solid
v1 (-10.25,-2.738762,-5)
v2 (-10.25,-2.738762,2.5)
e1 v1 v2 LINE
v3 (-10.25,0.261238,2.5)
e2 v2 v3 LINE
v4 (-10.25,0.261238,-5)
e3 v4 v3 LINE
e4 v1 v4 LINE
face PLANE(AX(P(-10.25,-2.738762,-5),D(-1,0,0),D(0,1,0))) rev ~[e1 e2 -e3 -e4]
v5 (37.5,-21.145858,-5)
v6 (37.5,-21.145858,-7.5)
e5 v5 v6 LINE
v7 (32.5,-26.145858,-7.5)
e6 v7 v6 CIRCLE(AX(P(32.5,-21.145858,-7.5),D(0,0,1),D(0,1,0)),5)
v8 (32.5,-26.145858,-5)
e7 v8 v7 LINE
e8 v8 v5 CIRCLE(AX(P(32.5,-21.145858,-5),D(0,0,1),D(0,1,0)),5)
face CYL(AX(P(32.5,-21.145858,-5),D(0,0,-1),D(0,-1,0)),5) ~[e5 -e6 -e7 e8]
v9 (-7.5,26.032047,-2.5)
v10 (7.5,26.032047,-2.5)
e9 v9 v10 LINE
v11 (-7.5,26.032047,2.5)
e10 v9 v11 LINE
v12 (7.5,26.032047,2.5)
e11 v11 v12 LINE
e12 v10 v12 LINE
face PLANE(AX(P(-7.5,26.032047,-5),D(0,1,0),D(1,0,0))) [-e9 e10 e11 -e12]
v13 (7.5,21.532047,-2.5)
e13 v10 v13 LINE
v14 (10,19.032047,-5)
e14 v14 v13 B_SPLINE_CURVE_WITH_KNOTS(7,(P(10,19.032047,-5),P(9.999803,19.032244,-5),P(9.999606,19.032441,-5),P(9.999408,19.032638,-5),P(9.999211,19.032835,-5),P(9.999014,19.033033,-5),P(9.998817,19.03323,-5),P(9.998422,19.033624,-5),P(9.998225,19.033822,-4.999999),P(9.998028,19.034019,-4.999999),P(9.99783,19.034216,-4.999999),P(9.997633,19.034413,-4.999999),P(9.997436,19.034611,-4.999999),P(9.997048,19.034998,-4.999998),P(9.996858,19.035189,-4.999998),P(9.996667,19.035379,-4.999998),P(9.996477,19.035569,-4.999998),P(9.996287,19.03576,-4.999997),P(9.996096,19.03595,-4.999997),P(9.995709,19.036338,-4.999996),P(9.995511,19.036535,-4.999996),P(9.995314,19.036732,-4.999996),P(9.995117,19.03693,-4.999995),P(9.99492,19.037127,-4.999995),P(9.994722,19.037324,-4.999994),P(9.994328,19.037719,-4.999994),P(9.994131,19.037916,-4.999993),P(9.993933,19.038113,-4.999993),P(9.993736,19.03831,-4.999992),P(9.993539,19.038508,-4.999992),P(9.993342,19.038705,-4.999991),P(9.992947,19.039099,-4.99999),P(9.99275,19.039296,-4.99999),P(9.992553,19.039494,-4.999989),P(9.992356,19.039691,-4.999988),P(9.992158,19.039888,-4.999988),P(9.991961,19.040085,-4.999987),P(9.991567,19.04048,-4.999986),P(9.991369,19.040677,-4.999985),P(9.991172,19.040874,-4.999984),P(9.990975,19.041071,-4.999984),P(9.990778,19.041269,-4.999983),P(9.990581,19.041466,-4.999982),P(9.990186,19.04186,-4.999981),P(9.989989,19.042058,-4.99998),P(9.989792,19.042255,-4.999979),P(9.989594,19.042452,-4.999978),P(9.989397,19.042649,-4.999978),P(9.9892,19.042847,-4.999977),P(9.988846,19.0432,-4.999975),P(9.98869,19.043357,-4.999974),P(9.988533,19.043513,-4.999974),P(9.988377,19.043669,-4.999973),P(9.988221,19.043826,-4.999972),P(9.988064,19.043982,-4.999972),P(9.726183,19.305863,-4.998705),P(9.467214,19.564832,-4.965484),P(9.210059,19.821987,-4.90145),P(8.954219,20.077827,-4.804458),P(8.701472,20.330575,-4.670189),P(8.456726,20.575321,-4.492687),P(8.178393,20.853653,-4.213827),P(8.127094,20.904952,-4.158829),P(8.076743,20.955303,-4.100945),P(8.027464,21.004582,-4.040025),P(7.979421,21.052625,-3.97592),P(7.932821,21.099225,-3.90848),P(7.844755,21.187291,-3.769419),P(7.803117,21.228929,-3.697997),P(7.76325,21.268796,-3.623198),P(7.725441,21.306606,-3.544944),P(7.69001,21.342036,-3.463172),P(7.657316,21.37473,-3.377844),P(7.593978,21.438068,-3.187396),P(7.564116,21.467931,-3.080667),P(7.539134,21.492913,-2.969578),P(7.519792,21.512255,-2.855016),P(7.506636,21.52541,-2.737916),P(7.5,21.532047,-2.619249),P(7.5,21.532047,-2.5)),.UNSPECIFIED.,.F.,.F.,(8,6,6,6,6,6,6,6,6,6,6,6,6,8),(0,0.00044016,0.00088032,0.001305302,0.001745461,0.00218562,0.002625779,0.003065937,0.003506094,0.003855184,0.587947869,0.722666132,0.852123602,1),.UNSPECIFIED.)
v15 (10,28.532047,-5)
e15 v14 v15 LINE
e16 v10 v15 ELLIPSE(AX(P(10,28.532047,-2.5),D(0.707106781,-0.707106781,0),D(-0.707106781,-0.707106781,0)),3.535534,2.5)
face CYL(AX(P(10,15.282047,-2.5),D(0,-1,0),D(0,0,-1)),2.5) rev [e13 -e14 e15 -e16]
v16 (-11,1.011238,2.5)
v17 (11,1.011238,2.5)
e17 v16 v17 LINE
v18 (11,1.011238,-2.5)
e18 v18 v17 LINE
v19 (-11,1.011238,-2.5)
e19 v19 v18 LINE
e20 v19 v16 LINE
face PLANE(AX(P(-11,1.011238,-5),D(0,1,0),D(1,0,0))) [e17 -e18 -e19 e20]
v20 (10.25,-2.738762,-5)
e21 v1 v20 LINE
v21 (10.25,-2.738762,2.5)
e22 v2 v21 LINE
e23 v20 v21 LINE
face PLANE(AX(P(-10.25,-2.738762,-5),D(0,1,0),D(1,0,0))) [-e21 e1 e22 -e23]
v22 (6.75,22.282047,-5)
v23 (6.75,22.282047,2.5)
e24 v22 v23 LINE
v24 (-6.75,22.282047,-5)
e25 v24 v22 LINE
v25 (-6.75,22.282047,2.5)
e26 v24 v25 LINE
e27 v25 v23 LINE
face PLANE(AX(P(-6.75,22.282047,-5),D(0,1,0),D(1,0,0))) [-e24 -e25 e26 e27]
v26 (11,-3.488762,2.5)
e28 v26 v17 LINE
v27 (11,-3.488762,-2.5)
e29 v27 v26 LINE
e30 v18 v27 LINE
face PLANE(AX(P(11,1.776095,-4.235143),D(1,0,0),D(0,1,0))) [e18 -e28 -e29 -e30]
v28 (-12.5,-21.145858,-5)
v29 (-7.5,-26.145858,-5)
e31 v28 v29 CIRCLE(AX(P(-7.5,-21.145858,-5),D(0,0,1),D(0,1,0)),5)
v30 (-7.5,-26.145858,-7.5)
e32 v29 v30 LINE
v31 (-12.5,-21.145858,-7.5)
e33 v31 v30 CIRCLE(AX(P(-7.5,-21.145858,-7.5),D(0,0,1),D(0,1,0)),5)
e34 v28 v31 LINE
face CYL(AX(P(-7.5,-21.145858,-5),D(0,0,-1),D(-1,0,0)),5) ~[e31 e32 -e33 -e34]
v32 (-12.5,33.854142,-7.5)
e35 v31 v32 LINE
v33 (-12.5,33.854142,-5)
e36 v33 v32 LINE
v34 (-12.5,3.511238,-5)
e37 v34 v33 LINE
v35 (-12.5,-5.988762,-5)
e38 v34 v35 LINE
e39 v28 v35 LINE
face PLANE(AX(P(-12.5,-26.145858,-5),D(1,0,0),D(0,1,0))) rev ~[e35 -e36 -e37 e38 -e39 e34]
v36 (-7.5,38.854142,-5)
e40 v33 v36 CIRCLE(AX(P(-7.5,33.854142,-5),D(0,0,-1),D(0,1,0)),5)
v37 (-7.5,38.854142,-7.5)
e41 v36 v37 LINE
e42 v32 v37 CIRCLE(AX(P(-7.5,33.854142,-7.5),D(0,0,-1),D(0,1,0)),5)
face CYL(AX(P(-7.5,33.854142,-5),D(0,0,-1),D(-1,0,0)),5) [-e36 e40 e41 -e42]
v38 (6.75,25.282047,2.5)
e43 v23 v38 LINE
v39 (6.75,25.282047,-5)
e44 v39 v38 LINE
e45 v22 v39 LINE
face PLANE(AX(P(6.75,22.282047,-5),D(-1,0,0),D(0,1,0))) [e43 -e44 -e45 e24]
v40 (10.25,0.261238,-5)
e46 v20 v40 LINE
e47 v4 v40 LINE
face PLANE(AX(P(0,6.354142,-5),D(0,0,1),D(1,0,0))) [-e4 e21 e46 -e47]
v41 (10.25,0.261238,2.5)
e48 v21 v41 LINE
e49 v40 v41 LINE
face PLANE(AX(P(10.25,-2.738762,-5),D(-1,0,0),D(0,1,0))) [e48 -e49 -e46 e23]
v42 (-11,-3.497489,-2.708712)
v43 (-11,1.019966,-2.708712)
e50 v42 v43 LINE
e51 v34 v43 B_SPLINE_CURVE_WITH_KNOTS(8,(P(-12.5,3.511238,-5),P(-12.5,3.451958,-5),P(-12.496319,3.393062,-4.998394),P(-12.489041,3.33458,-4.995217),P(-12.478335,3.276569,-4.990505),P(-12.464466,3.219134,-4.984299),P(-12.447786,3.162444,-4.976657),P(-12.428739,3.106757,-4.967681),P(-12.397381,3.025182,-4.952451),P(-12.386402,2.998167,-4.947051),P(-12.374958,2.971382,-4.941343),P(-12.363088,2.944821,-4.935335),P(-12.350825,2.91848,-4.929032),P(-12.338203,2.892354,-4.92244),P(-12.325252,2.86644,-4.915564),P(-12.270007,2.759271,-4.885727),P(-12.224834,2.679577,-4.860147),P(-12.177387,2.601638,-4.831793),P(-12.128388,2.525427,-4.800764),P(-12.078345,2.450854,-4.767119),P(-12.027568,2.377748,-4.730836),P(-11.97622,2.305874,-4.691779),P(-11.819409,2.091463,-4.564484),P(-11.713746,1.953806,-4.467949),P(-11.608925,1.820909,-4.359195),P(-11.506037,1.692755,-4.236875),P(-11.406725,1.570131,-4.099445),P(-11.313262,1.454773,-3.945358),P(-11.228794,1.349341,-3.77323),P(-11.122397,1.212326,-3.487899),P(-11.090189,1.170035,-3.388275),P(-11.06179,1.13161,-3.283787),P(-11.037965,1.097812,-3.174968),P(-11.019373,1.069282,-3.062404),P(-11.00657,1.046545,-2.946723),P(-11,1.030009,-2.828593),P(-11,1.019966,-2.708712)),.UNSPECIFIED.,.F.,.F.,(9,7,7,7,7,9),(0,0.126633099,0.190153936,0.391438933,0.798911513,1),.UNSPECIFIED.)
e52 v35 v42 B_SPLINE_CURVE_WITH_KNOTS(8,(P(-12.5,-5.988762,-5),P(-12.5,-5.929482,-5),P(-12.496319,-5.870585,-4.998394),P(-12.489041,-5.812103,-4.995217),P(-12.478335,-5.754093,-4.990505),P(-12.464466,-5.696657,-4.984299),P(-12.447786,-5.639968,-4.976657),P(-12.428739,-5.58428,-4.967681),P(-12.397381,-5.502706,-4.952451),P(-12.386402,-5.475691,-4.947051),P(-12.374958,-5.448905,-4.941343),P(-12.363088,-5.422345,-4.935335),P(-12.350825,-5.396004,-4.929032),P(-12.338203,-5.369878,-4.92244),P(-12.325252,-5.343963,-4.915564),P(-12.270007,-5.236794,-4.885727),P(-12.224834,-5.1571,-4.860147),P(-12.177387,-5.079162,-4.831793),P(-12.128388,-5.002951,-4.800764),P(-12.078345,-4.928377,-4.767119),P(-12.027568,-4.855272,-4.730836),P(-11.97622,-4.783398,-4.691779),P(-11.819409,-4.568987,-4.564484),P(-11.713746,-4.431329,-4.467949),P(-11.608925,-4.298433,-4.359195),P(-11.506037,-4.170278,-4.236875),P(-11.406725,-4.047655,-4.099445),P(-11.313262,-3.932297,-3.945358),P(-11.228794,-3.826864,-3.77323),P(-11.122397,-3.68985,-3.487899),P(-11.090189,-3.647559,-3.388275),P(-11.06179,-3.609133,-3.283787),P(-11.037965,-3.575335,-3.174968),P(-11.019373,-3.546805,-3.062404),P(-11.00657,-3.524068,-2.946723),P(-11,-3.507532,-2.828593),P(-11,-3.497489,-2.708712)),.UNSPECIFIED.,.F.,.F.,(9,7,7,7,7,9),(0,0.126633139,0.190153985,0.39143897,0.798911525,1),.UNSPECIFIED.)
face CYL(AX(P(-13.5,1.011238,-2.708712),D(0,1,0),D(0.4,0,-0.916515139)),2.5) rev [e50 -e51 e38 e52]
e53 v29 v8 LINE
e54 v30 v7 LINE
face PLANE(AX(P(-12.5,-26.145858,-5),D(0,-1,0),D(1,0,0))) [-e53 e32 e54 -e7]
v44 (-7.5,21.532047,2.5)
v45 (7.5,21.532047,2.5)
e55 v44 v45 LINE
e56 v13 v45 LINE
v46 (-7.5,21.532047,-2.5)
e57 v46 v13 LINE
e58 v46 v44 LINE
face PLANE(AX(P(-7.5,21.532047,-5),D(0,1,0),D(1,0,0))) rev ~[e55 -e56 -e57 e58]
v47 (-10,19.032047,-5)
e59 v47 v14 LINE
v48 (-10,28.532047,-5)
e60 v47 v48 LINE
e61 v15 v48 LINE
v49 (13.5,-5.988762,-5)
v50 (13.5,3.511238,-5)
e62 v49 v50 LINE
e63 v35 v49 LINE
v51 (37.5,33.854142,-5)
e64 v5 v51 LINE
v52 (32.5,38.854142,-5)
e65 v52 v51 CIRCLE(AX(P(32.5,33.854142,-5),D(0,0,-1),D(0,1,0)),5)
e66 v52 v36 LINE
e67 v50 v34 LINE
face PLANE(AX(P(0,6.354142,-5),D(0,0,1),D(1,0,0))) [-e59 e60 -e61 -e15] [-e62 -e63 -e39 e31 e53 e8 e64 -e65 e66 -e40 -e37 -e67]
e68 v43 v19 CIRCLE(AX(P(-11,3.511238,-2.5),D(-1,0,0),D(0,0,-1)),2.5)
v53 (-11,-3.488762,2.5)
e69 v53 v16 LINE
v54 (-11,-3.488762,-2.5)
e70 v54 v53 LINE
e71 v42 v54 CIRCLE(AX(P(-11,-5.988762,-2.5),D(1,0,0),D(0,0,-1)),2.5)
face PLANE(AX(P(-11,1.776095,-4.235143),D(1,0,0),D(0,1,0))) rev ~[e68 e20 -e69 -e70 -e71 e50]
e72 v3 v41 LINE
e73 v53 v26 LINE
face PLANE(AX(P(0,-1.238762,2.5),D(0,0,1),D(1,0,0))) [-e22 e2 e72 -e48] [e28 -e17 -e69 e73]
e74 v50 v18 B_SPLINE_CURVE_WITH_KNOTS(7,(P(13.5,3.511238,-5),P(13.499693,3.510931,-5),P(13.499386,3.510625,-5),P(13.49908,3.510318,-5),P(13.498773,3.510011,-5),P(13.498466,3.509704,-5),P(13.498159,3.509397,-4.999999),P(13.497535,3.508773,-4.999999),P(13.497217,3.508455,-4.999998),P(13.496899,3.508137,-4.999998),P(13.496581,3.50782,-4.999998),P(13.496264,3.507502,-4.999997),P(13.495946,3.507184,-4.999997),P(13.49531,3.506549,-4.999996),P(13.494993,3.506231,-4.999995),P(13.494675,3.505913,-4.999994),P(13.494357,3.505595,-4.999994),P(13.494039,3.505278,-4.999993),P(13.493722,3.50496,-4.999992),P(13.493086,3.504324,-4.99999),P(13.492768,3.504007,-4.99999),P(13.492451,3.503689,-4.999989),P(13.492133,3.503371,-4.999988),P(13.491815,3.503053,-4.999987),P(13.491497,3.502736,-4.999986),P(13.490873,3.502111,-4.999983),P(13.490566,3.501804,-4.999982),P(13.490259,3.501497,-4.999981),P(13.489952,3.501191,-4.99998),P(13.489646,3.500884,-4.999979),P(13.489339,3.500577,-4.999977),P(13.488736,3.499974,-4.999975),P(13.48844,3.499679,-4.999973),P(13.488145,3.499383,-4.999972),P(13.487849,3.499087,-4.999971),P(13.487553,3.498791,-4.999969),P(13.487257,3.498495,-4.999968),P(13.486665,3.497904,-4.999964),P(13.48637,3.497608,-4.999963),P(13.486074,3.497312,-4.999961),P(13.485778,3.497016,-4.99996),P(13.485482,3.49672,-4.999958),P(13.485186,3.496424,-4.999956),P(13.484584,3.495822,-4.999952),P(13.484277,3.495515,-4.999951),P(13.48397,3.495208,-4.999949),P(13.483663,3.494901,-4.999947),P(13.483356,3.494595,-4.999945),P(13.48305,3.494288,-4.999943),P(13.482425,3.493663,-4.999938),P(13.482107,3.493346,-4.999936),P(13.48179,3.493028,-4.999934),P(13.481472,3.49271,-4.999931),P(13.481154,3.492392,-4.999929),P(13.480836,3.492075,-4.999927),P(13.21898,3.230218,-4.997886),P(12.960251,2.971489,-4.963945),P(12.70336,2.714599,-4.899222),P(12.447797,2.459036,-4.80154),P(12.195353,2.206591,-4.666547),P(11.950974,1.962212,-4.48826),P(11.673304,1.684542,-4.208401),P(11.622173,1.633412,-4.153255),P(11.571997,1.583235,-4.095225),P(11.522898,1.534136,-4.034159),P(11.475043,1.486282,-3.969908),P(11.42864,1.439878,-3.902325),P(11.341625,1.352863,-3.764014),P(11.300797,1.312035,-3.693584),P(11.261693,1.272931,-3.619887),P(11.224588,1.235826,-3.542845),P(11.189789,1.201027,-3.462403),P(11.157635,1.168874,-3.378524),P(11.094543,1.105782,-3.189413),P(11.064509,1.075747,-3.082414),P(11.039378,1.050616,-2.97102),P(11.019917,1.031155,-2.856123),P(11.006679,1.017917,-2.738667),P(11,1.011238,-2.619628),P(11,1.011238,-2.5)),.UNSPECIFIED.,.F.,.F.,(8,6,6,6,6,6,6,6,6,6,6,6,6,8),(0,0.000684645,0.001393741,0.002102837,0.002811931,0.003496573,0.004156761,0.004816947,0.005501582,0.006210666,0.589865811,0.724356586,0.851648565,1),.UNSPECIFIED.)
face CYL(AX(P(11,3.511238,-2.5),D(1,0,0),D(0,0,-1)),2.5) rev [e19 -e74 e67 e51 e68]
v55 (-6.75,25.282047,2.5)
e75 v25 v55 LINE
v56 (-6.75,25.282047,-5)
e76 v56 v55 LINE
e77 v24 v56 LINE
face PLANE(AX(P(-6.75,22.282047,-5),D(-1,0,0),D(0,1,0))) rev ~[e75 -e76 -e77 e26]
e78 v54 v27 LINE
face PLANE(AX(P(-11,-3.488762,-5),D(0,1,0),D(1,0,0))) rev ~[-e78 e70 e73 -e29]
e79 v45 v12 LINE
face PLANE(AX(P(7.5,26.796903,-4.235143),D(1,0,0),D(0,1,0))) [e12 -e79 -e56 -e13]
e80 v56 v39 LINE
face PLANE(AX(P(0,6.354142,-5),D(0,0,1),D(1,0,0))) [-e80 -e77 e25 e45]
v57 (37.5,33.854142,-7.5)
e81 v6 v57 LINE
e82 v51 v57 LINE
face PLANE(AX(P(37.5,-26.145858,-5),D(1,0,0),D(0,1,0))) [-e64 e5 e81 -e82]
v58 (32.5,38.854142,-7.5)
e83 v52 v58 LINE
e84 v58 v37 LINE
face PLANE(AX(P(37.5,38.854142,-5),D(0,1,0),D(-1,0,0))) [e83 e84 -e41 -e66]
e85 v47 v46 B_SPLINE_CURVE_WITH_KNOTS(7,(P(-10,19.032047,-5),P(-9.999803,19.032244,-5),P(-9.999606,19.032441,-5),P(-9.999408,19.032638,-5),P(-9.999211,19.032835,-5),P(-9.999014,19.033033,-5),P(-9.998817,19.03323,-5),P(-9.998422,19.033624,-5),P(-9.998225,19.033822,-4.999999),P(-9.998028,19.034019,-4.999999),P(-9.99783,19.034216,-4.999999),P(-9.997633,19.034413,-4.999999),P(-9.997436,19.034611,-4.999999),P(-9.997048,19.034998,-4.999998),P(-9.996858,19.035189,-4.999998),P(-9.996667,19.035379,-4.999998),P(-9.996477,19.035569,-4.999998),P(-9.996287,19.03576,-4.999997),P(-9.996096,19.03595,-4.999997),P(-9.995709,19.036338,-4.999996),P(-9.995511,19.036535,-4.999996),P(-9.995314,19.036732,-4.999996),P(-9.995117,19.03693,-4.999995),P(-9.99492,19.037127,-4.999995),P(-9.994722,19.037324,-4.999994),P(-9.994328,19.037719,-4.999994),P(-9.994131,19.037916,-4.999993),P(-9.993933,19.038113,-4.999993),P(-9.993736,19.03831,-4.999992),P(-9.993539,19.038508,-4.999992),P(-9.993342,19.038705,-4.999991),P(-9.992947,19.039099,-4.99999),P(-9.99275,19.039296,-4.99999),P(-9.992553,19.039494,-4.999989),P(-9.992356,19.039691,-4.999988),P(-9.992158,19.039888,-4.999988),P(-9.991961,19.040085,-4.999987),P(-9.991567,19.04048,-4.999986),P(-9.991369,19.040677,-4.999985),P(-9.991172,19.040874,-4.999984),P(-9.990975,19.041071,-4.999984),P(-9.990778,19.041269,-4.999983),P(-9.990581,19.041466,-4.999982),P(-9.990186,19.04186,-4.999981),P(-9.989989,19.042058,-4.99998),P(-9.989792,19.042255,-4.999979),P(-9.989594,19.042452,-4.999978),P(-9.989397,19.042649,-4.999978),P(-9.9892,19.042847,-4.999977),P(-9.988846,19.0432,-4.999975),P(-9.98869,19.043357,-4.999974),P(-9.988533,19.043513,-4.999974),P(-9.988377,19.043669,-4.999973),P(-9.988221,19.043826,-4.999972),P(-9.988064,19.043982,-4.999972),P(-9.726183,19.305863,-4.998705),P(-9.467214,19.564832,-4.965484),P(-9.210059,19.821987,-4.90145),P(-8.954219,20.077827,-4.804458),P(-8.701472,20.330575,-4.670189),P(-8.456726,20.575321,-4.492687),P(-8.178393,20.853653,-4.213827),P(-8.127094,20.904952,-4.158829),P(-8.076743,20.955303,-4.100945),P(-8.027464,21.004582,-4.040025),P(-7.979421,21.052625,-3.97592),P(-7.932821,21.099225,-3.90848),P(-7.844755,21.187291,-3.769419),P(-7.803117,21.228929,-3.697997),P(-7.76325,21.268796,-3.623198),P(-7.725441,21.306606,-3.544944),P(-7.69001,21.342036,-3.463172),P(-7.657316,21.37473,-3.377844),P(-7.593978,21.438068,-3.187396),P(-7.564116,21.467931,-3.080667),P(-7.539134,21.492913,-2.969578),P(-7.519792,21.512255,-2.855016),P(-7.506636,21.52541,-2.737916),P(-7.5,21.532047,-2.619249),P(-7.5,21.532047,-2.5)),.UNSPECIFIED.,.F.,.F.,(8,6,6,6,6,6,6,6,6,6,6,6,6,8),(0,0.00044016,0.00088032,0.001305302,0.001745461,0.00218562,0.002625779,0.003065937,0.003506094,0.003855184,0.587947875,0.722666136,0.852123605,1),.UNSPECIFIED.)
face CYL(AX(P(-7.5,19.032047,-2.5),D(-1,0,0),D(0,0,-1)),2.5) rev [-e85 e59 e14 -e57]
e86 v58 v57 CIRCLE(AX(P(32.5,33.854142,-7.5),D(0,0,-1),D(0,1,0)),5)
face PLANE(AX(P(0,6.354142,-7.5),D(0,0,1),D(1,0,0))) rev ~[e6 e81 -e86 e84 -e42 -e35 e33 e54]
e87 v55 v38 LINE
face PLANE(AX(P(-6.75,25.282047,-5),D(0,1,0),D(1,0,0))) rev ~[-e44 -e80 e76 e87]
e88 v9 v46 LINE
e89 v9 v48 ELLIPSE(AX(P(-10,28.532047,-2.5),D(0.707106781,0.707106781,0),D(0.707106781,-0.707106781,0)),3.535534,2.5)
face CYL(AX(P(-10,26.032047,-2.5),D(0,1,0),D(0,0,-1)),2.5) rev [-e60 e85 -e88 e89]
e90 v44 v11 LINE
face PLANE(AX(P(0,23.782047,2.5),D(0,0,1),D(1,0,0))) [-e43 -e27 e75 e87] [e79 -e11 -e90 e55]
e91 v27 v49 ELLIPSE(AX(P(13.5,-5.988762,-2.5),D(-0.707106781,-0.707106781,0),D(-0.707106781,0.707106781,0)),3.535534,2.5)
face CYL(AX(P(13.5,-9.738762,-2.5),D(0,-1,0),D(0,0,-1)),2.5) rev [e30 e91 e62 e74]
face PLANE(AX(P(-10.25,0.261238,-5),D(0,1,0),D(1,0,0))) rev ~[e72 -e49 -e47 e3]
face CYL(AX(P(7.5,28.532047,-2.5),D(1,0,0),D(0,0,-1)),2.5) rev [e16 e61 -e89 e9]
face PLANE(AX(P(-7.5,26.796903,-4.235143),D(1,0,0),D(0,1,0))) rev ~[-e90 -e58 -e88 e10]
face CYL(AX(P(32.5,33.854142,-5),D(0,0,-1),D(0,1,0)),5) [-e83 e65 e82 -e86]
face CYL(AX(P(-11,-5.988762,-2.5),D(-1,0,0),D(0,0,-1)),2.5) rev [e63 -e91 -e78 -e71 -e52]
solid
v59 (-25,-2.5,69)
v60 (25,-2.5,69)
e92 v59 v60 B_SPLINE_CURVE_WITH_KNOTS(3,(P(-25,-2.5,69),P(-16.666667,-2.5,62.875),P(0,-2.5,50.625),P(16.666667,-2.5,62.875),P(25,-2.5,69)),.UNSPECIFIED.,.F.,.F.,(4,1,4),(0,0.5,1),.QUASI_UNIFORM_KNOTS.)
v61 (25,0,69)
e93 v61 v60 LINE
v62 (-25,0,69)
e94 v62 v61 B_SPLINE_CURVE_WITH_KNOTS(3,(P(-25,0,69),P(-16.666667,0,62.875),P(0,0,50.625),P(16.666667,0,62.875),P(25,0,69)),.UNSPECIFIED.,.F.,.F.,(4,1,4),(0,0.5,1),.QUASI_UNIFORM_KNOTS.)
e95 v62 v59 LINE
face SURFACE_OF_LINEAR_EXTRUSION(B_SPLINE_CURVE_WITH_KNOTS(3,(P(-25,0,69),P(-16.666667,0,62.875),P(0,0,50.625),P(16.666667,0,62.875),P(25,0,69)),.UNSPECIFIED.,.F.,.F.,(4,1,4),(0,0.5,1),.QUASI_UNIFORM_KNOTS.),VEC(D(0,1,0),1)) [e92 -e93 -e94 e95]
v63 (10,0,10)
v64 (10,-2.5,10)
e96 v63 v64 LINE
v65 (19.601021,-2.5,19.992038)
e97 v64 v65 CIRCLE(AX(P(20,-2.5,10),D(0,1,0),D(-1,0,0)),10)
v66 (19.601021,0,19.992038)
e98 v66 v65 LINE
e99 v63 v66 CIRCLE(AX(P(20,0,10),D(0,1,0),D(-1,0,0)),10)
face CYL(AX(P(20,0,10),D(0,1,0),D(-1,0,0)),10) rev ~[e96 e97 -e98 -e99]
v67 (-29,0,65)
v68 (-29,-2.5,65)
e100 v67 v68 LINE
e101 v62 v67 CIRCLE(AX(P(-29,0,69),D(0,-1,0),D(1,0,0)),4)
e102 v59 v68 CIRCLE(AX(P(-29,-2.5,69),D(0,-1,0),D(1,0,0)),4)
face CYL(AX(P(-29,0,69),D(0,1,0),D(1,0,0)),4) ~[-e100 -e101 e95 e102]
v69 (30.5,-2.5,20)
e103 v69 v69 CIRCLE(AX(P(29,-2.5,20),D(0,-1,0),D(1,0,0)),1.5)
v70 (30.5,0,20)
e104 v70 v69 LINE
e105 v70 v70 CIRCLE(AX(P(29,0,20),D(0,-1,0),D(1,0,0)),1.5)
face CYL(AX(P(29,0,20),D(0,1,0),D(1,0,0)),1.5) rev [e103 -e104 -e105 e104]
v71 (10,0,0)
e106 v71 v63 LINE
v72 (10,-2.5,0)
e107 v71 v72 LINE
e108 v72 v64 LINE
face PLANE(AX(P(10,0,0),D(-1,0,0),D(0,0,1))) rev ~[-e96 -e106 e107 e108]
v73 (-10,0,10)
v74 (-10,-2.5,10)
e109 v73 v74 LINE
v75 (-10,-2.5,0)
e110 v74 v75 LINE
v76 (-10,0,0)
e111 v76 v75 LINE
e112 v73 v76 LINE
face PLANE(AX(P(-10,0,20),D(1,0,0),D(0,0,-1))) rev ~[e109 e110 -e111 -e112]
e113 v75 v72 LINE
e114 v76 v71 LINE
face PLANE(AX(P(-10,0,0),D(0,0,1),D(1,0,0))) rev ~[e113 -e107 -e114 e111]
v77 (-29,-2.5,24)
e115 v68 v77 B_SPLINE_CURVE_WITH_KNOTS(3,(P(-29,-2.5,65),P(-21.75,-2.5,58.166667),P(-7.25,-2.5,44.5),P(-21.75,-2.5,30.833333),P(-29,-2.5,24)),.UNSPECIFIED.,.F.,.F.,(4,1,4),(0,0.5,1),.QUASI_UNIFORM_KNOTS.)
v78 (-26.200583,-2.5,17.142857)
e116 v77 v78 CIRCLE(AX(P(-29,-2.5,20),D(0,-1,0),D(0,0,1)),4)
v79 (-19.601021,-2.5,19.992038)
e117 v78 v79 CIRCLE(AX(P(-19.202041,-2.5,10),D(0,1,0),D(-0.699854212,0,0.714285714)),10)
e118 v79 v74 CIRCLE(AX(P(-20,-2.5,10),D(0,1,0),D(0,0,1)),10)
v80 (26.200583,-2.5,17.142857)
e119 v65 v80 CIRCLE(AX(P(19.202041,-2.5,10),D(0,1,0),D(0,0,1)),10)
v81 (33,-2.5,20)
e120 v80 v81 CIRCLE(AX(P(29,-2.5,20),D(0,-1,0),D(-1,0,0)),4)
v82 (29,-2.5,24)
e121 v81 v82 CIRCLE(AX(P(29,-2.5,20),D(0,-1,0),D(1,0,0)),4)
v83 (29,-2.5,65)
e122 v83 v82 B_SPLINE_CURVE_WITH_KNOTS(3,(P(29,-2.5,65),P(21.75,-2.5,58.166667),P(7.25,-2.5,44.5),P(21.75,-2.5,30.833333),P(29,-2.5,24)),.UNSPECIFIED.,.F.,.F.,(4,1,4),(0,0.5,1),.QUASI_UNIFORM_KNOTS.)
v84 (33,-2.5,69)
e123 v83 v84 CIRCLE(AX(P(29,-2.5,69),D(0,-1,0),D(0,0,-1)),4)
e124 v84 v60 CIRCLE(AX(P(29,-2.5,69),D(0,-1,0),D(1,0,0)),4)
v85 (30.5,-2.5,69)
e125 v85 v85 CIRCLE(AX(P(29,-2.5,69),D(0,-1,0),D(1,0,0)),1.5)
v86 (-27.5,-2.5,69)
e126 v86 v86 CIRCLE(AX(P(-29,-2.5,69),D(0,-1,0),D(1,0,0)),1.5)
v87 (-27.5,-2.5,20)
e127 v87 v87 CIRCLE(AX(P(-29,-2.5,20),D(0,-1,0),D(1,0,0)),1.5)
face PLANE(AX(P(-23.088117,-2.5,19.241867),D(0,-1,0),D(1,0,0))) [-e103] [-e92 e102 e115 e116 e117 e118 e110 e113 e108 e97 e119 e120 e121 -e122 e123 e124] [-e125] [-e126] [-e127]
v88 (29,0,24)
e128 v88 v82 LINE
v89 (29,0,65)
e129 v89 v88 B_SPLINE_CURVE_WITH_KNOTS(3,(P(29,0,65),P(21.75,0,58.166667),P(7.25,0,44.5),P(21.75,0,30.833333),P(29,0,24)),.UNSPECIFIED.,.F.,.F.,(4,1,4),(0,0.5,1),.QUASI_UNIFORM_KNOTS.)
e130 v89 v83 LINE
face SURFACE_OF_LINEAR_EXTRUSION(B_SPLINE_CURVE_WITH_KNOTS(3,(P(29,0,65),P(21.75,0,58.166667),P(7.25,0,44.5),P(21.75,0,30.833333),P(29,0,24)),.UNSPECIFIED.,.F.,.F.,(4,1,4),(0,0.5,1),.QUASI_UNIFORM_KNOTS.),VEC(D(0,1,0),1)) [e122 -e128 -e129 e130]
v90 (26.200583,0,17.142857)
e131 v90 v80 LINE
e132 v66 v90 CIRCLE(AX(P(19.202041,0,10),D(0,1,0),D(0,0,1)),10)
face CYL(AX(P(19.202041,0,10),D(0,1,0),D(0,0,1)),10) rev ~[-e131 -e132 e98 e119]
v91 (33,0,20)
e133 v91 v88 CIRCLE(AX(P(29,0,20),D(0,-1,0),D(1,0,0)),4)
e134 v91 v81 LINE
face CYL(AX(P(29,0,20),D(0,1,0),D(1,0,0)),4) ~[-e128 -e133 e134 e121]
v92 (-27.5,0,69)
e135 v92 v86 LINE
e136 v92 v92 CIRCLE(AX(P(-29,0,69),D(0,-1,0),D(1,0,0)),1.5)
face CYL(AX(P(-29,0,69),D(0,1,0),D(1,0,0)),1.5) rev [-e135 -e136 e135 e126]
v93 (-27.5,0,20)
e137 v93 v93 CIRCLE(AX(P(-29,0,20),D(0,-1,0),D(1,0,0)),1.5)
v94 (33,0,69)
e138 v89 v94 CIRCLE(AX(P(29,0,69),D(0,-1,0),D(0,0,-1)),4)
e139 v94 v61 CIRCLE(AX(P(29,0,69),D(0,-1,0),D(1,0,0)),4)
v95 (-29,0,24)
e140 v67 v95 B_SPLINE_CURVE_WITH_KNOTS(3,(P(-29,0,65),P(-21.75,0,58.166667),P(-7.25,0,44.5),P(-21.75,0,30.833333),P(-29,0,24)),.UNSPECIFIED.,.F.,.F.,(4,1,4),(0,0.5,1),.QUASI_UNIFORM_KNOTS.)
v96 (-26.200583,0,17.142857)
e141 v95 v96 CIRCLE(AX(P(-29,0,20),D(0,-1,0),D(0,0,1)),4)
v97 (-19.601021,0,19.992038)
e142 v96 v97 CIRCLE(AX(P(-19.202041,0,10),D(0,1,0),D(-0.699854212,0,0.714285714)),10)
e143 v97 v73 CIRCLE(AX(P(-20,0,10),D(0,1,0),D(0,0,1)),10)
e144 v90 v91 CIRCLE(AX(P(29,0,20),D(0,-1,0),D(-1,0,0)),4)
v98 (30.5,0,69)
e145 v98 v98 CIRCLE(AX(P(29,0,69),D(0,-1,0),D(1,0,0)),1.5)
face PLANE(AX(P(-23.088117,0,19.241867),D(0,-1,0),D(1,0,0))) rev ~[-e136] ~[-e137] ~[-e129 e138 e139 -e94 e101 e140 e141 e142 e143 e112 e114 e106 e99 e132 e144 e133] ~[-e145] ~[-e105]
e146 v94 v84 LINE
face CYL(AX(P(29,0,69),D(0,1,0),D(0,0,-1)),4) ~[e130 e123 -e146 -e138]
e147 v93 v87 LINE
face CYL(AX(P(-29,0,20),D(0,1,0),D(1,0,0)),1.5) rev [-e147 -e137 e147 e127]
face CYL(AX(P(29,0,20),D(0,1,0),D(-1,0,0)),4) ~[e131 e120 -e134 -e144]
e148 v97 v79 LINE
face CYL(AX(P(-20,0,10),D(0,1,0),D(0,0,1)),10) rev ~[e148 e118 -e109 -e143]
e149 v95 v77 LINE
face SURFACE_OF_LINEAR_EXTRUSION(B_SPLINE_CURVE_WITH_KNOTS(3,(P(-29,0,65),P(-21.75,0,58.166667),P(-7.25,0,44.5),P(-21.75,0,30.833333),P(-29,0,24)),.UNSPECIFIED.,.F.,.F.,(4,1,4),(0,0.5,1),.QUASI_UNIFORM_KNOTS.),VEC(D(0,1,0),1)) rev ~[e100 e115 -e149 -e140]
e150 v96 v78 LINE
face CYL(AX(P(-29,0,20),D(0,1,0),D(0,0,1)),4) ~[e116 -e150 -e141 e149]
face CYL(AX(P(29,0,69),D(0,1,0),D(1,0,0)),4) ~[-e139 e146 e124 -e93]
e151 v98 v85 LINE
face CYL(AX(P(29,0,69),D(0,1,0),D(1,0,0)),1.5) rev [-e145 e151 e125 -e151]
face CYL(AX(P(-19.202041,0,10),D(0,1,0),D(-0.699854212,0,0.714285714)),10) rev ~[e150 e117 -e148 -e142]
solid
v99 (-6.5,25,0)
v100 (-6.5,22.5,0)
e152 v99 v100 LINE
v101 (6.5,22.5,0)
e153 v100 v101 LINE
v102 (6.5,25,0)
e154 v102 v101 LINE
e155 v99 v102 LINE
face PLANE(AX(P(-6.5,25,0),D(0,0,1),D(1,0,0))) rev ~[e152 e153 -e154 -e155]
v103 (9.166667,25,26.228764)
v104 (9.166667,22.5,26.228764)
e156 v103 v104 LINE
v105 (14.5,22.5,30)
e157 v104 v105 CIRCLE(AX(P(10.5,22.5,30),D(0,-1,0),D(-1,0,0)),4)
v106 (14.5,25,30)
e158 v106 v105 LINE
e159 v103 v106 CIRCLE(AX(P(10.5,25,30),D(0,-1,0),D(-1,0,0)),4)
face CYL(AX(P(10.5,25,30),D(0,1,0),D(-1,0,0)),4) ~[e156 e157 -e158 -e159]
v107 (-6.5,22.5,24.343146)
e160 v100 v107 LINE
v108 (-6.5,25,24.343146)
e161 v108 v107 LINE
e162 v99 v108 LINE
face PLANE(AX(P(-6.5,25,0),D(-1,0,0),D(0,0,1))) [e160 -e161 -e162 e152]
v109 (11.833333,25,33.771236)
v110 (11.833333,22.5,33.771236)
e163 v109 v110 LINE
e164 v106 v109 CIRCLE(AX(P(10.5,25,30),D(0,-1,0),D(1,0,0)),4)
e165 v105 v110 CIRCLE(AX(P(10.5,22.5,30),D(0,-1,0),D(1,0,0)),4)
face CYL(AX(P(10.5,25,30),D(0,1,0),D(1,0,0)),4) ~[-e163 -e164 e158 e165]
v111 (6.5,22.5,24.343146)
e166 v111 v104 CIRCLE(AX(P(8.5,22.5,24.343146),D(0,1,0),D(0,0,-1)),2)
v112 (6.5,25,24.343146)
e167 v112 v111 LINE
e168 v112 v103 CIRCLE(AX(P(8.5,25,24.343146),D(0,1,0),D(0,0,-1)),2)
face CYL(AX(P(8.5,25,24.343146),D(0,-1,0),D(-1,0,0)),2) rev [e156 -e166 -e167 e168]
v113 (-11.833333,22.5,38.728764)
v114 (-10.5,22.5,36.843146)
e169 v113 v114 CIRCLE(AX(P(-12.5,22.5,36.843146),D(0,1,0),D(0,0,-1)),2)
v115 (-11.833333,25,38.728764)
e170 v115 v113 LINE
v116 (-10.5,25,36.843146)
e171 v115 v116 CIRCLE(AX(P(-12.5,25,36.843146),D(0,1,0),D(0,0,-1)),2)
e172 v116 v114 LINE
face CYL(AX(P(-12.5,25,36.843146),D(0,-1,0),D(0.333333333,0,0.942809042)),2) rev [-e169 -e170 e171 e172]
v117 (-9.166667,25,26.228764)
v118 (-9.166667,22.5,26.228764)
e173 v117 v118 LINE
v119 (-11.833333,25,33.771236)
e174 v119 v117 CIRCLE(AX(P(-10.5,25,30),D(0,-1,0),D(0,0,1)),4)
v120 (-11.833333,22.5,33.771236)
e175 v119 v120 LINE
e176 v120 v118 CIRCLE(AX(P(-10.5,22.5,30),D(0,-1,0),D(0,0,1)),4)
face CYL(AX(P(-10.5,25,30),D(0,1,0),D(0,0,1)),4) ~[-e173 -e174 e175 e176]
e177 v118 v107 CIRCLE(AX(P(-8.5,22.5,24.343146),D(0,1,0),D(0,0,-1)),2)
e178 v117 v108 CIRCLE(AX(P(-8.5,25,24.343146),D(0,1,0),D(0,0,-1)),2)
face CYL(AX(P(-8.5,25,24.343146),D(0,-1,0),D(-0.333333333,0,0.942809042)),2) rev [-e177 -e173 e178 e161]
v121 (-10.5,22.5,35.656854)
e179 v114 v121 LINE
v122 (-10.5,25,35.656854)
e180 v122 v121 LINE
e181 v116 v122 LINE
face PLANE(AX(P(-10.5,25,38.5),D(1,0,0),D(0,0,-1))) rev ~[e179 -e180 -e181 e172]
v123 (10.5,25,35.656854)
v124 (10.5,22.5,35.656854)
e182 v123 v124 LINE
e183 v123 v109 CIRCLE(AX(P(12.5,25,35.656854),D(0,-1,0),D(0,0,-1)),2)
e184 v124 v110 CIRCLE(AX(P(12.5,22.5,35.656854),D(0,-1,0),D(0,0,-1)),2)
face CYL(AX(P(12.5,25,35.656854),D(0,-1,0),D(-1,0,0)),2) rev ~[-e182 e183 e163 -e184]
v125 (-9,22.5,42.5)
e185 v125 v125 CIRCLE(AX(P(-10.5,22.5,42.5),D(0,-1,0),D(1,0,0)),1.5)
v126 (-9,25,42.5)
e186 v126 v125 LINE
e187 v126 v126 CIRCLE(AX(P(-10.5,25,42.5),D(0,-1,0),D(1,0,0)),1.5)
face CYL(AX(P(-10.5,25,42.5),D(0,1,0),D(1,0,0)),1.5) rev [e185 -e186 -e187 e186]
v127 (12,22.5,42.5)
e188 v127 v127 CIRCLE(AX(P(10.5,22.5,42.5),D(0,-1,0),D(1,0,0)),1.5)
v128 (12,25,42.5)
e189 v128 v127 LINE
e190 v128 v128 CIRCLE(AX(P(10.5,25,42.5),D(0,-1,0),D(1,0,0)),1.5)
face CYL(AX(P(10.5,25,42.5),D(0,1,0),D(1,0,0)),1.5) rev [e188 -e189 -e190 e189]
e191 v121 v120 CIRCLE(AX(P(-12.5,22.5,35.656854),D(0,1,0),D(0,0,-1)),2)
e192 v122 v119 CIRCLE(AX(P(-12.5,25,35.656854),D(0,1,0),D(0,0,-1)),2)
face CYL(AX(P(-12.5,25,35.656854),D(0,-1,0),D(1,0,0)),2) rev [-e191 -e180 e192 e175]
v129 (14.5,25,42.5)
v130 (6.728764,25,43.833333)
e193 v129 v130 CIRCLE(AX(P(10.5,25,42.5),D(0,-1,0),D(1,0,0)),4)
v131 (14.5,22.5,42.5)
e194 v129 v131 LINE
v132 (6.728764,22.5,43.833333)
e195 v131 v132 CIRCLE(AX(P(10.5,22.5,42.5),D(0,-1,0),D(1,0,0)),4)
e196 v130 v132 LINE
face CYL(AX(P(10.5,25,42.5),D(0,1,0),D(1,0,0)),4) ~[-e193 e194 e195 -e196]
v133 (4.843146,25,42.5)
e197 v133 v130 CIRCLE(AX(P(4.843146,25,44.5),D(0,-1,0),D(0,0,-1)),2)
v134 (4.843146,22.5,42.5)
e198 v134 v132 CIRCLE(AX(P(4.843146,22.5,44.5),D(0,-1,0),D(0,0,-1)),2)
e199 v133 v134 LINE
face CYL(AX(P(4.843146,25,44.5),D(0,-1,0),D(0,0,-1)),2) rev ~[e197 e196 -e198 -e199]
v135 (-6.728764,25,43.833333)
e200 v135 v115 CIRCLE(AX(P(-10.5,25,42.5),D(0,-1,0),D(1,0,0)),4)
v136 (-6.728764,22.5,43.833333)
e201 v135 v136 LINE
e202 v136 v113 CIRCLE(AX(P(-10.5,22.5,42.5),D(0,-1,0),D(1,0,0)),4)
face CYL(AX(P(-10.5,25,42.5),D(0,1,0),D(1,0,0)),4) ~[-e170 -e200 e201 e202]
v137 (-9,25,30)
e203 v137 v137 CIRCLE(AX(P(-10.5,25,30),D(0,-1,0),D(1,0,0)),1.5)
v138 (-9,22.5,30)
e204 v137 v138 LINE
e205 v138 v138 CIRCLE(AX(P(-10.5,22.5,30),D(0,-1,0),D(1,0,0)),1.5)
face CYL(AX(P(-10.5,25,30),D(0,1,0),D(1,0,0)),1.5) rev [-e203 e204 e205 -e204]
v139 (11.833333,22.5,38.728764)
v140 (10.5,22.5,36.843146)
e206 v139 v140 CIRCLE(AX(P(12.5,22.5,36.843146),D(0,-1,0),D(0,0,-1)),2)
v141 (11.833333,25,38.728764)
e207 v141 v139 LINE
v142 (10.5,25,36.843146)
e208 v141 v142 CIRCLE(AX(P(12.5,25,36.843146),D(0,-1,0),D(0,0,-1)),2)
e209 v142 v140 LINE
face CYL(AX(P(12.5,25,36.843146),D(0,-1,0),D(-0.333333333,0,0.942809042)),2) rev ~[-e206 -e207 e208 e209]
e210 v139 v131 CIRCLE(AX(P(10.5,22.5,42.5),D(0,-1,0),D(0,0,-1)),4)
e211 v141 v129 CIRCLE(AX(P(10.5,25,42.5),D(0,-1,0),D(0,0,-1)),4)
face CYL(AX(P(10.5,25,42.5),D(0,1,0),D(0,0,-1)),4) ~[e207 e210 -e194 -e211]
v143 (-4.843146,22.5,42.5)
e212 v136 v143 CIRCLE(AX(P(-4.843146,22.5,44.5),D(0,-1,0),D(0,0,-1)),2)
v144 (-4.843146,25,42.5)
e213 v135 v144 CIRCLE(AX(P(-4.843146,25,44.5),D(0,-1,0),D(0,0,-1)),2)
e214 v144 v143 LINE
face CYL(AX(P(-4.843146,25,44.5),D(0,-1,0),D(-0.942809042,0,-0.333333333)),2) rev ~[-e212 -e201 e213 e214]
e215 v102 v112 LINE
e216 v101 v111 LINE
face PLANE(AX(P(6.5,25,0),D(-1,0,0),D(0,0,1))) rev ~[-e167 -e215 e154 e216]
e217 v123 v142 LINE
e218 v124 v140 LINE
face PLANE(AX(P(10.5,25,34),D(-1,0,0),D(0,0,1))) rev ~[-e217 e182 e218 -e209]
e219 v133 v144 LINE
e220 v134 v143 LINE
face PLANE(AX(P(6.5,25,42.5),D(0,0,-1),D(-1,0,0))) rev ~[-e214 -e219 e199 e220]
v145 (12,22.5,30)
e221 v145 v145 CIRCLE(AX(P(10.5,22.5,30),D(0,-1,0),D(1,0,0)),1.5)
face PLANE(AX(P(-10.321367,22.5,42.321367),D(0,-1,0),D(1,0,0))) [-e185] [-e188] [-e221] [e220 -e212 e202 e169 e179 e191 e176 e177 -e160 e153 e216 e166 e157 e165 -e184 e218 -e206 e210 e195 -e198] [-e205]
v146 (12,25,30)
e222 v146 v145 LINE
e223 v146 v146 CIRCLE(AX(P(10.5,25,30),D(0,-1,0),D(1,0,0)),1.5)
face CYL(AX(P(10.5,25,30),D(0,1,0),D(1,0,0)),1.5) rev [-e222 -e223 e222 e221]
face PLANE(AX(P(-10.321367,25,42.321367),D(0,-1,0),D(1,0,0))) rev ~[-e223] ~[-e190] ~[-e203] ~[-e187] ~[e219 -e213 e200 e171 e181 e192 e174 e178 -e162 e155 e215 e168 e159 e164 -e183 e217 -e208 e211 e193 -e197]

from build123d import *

# Parameters (mm, degrees)
F0_R          = 1.5
F1_DEPTH      = 2.5
F2_T1_DEPTH   = 2.5
F4_R          = 1.5
F4_W          = 13
F4_H          = 30
F5_DEPTH      = 2.5
F6_R          = 2
F7_R          = 2
F9_W          = 25
F9_H          = 65
F9_W_2        = 22
F9_H_2        = 4.5
F9_W_3        = 15
F9_W_4        = 20.5
F9_H_3        = 3
F9_W_5        = 13.5
F10_DEPTH     = 2.5
F11_DEPTH     = 7.5
F12_R         = 5
F13_T1_DEPTH  = 15
F13_T3_DEPTH  = 22
F13_T5_DEPTH  = 4.5
F13_T7_DEPTH  = 4.5
F13_T13_DEPTH = 10.75
F13_T17_DEPTH = 21.25
F13_T24_DEPTH = 21.25
F13_T29_DEPTH = 10.75
F13_T36_DEPTH = 10.75
F13_T40_DEPTH = 28.25
F13_T47_DEPTH = 28.25
F13_T52_DEPTH = 10.2282196187
F13_T59_DEPTH = 21.25
F13_T64_DEPTH = 10.75
F13_T71_DEPTH = 28.25
F13_T76_DEPTH = 10.2282196187
F13_T83_DEPTH = 21.25
F13_T87_DEPTH = 10.75
F13_T94_DEPTH = 28.25
F13_T98_DEPTH = 10.75


# Not quite as in the source:
# - a fillet or chamfer that OpenCascade refuses, or shapes differently, is made with other operations: its cross-section is extruded or revolved along the edge and cut away or added


with BuildPart() as f1:
    # F0 (on Front) → F1 (new body)
    with BuildSketch(Plane.XZ):
        with BuildLine():
            ThreePointArc((-29, 65), (-26.1715728753, 66.1715728753), (-25, 69))
            ThreePointArc((-25, 69), (-31.8284271247, 71.8284271247), (-29, 65))
        make_face()
        with Locations((-29, 69)):
            Circle(F0_R, mode=Mode.SUBTRACT)
        with BuildLine():
            add(Edge.make_bspline(
                [(-25, 69), (-16.6666666667, 62.875), (0, 50.625), (16.6666666667, 62.875), (25, 69)],
                knots=[0, 0, 0, 0, 0.5, 1, 1, 1, 1], degree=3))
            ThreePointArc((-25, 69), (-26.1715728753, 66.1715728753), (-29, 65))
            add(Edge.make_bspline(
                [(-29, 65), (-21.75, 58.1666666667), (-7.25, 44.5), (-21.75, 30.8333333333), (-29, 24)],
                knots=[0, 0, 0, 0, 0.5, 1, 1, 1, 1], degree=3))
            ThreePointArc((-29, 24), (-26.1715728753, 22.8284271247), (-25, 20))
            Line((-25, 20), (-10, 20))
            Line((-10, 20), (-10, 0))
            Line((-10, 0), (10, 0))
            Line((10, 0), (10, 20))
            Line((10, 20), (25, 20))
            ThreePointArc((25, 20), (26.1715728753, 22.8284271247), (29, 24))
            add(Edge.make_bspline(
                [(29, 65), (21.75, 58.1666666667), (7.25, 44.5), (21.75, 30.8333333333), (29, 24)],
                knots=[0, 0, 0, 0, 0.5, 1, 1, 1, 1], degree=3))
            ThreePointArc((29, 65), (26.1715728753, 66.1715728753), (25, 69))
        make_face()
        with BuildLine():
            ThreePointArc((33, 69), (29, 73), (25, 69))
            ThreePointArc((25, 69), (26.1715728753, 66.1715728753), (29, 65))
            ThreePointArc((29, 65), (31.8284271247, 66.1715728753), (33, 69))
        make_face()
        with Locations((29, 69)):
            Circle(F0_R, mode=Mode.SUBTRACT)
        with BuildLine():
            ThreePointArc((-25, 20), (-26.1715728753, 22.8284271247), (-29, 24))
            ThreePointArc((-29, 24), (-31.8284271247, 17.1715728753), (-25, 20))
        make_face()
        with Locations((-29, 20)):
            Circle(F0_R, mode=Mode.SUBTRACT)
        with BuildLine():
            ThreePointArc((33, 20), (31.8284271247, 22.8284271247), (29, 24))
            ThreePointArc((29, 24), (26.1715728753, 22.8284271247), (25, 20))
            ThreePointArc((25, 20), (29, 16), (33, 20))
        make_face()
        with Locations((29, 20)):
            Circle(F0_R, mode=Mode.SUBTRACT)
    extrude(amount=F1_DEPTH)

    # F2: fillet of radius 10 on 4 edges, made by hand

    # F2_s2 → F2_t1 (join)
    with BuildSketch(Plane.XZ):
        with BuildLine():
            ThreePointArc((-26.2005831511, 17.1428571429), (-22.981685759, 19.2582009977), (-19.2020410289, 20))
            Line((-19.2020410289, 20), (-25, 20))
            ThreePointArc((-25, 20), (-25.3123403495, 18.4504302848), (-26.2005831511, 17.1428571429))
        make_face()
        with BuildLine():
            ThreePointArc((19.2020410289, 20), (22.981685759, 19.2582009977), (26.2005831511, 17.1428571429))
            ThreePointArc((26.2005831511, 17.1428571429), (25.3123403495, 18.4504302848), (25, 20))
            Line((25, 20), (19.2020410289, 20))
        make_face()
        with BuildLine():
            ThreePointArc((-20, 20), (-12.9289321881, 17.0710678119), (-10, 10))
            Line((-10, 10), (-10, 20))
            Line((-10, 20), (-20, 20))
        make_face()
        with BuildLine():
            ThreePointArc((10, 10), (12.9289321881, 17.0710678119), (20, 20))
            Line((20, 20), (10, 20))
            Line((10, 20), (10, 10))
        make_face()
    extrude(amount=F2_T1_DEPTH)


with BuildPart() as f5:
    # F4 (on offset) → F5 (new body)
    with BuildSketch(Plane.XZ.offset(-25)):
        with BuildLine():
            ThreePointArc((-10.5, 38.5), (-7.6715728753, 39.6715728753), (-6.5, 42.5))
            ThreePointArc((-6.5, 42.5), (-13.3284271247, 45.3284271247), (-10.5, 38.5))
        make_face()
        with Locations((-10.5, 42.5)):
            Circle(F4_R, mode=Mode.SUBTRACT)
        with BuildLine():
            Line((6.5, 42.5), (-6.5, 42.5))
            ThreePointArc((-6.5, 42.5), (-7.6715728753, 39.6715728753), (-10.5, 38.5))
            Line((-10.5, 38.5), (-10.5, 34))
            ThreePointArc((-10.5, 34), (-7.6715728753, 32.8284271247), (-6.5, 30))
            Line((-6.5, 30), (6.5, 30))
            ThreePointArc((6.5, 30), (7.6715728753, 32.8284271247), (10.5, 34))
            Line((10.5, 34), (10.5, 38.5))
            ThreePointArc((10.5, 38.5), (7.6715728753, 39.6715728753), (6.5, 42.5))
        make_face()
        with BuildLine():
            ThreePointArc((14.5, 42.5), (10.5, 46.5), (6.5, 42.5))
            ThreePointArc((6.5, 42.5), (7.6715728753, 39.6715728753), (10.5, 38.5))
            ThreePointArc((10.5, 38.5), (13.3284271247, 39.6715728753), (14.5, 42.5))
        make_face()
        with Locations((10.5, 42.5)):
            Circle(F4_R, mode=Mode.SUBTRACT)
        with BuildLine():
            ThreePointArc((-6.5, 30), (-7.6715728753, 32.8284271247), (-10.5, 34))
            ThreePointArc((-10.5, 34), (-13.3284271247, 27.1715728753), (-6.5, 30))
        make_face()
        with Locations((-10.5, 30)):
            Circle(F4_R, mode=Mode.SUBTRACT)
        with Locations((0, 15)):
            Rectangle(F4_W, F4_H)
        with BuildLine():
            ThreePointArc((14.5, 30), (13.3284271247, 32.8284271247), (10.5, 34))
            ThreePointArc((10.5, 34), (7.6715728753, 32.8284271247), (6.5, 30))
            ThreePointArc((6.5, 30), (10.5, 26), (14.5, 30))
        make_face()
        with Locations((10.5, 30)):
            Circle(F4_R, mode=Mode.SUBTRACT)
    extrude(amount=F5_DEPTH)

    # F6
    f6_edges = [f5.edges().sort_by_distance(p)[0] for p in [
        (-6.5, 23.75, 42.5),
        (6.5, 23.75, 42.5),
        (10.5, 23.75, 38.5),
        (-10.5, 23.75, 38.5),
        (-10.5, 23.75, 34),
        (10.5, 23.75, 34),
    ]]
    fillet(f6_edges, radius=F6_R)

    # F7
    f7_edges = [f5.edges().sort_by_distance(p)[0] for p in [
        (-6.5, 23.75, 30),
        (6.5, 23.75, 30),
    ]]
    fillet(f7_edges, radius=F7_R)


with BuildPart() as f10:
    # F9 (on offset) → F10 (new body)
    with BuildSketch(Plane.XY.offset(-5)):
        with Locations((0, 6.3541418326)):
            Rectangle(F9_W, F9_H)
        with Locations((0, -1.238761819)):
            Rectangle(F9_W_2, F9_H_2, mode=Mode.SUBTRACT)
        with Locations((0, 23.7820465118)):
            Rectangle(F9_W_3, F9_H_2, mode=Mode.SUBTRACT)
        with Locations((25, 6.3541418326)):
            Rectangle(F9_W, F9_H)
        with Locations((0, -1.238761819)):
            Rectangle(F9_W_2, F9_H_2)
        with Locations((0, -1.238761819)):
            Rectangle(F9_W_4, F9_H_3, mode=Mode.SUBTRACT)
        with Locations((0, 23.7820465118)):
            Rectangle(F9_W_3, F9_H_2)
        with Locations((0, 23.7820465118)):
            Rectangle(F9_W_5, F9_H_3, mode=Mode.SUBTRACT)
        with Locations((0, -1.238761819)):
            Rectangle(F9_W_4, F9_H_3)
        with Locations((0, 23.7820465118)):
            Rectangle(F9_W_5, F9_H_3)
    extrude(amount=-F10_DEPTH)

    # F9 (on offset) → F11 (join)
    with BuildSketch(Plane.XY.offset(-5)):
        with Locations((0, 23.7820465118)):
            Rectangle(F9_W_3, F9_H_2)
        with Locations((0, 23.7820465118)):
            Rectangle(F9_W_5, F9_H_3, mode=Mode.SUBTRACT)
        with Locations((0, -1.238761819)):
            Rectangle(F9_W_2, F9_H_2)
        with Locations((0, -1.238761819)):
            Rectangle(F9_W_4, F9_H_3, mode=Mode.SUBTRACT)
    extrude(amount=F11_DEPTH)

    # F12
    f12_edges = [f10.edges().sort_by_distance(p)[0] for p in [
        (-12.5, 38.854142, -6.25),
        (-12.5, -26.145858, -6.25),
        (37.5, -26.145858, -6.25),
        (37.5, 38.854142, -6.25),
    ]]
    fillet(f12_edges, radius=F12_R)

    # F13: fillet of radius 2.5 on 8 edges, made by hand

    # F13_s2 → F13_t1 (join)
    with BuildSketch(Plane.YZ.offset(-7.5)):
        with BuildLine():
            ThreePointArc((28.5320465118, -5), (26.7642795588, -4.267766953), (26.0320465118, -2.5))
            Line((26.0320465118, -2.5), (26.0320465118, -5))
            Line((26.0320465118, -5), (28.5320465118, -5))
        make_face()
        with BuildLine():
            ThreePointArc((19.0320465118, -5), (20.7998134647, -4.267766953), (21.5320465118, -2.5))
            Line((21.5320465118, -2.5), (21.5320465118, -5))
            Line((21.5320465118, -5), (19.0320465118, -5))
        make_face()
    extrude(amount=F13_T1_DEPTH)

    # F13_s4 → F13_t3 (join)
    with BuildSketch(Plane.YZ.offset(-11)):
        with BuildLine():
            ThreePointArc((3.511238181, -5), (1.7434712281, -4.267766953), (1.011238181, -2.5))
            Line((1.011238181, -2.5), (1.011238181, -5))
            Line((1.011238181, -5), (3.511238181, -5))
        make_face()
        with BuildLine():
            ThreePointArc((-5.988761819, -5), (-4.220994866, -4.267766953), (-3.488761819, -2.5))
            Line((-3.488761819, -2.5), (-3.488761819, -5))
            Line((-3.488761819, -5), (-5.988761819, -5))
        make_face()
    extrude(amount=F13_T3_DEPTH)

    # F13_s6 → F13_t5 (join)
    with BuildSketch(Plane.XZ.offset(-26.0320465118)):
        with BuildLine():
            ThreePointArc((-10, -5), (-8.232233047, -4.267766953), (-7.5, -2.5))
            Line((-7.5, -2.5), (-7.5, -5))
            Line((-7.5, -5), (-10, -5))
        make_face()
        with BuildLine():
            ThreePointArc((10, -5), (8.232233047, -4.267766953), (7.5, -2.5))
            Line((7.5, -2.5), (7.5, -5))
            Line((7.5, -5), (10, -5))
        make_face()
    extrude(amount=F13_T5_DEPTH)

    # F13_s8 → F13_t7 (join)
    with BuildSketch(Plane.XZ.offset(-1.011238181)):
        with BuildLine():
            ThreePointArc((-12.5, -5), (-11.4083499337, -4.0780185463), (-11, -2.7087121525))
            Line((-11, -2.7087121525), (-11, -5))
            Line((-11, -5), (-12.5, -5))
        make_face()
        with BuildLine():
            ThreePointArc((13.5, -5), (11.732233047, -4.267766953), (11, -2.5))
            Line((11, -2.5), (11, -5))
            Line((11, -5), (13.5, -5))
        make_face()
    extrude(amount=F13_T7_DEPTH)


with BuildPart() as f13_tool11:
    # F13_s12 → F13_t13 (new body)
    with BuildSketch(Plane.XZ.offset(-21.5320465118)):
        with BuildLine():
            ThreePointArc((10, -5), (8.232233047, -4.267766953), (7.5, -2.5))
            Line((7.5, -2.5), (7.5, -5))
            Line((7.5, -5), (10, -5))
        make_face()
    extrude(amount=-F13_T13_DEPTH)

    split(bisect_by=Plane.XZ.offset(-26.0320465118), keep=Keep.BOTTOM)


with BuildPart() as f13_tool15:
    # F13_s16 → F13_t17 (new body)
    with BuildSketch(Plane.YZ.offset(13.75)):
        with BuildLine():
            ThreePointArc((28.5320465118, -5), (26.7642795588, -4.267766953), (26.0320465118, -2.5))
            Line((26.0320465118, -2.5), (26.0320465118, -5))
            Line((26.0320465118, -5), (28.5320465118, -5))
        make_face()
    extrude(amount=-F13_T17_DEPTH)

    split(bisect_by=Plane.YZ.offset(7.5), keep=Keep.TOP)


with BuildPart() as f13_tool11_1:
    add(f13_tool11.part)

    # F13_t19: intersect F13_tool15
    add(f13_tool15.part, mode=Mode.INTERSECT)


with BuildPart() as f10_1:
    add(f10.part)

    # F13_t9: union F13_tool11
    add(f13_tool11_1.part)


with BuildPart() as f13_tool22:
    # F13_s23 → F13_t24 (new body)
    with BuildSketch(Plane.YZ.offset(7.5)):
        with BuildLine():
            ThreePointArc((28.5320465118, -5), (26.7642795588, -4.267766953), (26.0320465118, -2.5))
            Line((26.0320465118, -2.5), (26.0320465118, -5))
            Line((26.0320465118, -5), (28.5320465118, -5))
        make_face()
    extrude(amount=-F13_T24_DEPTH)

    split(bisect_by=Plane.YZ.offset(-12.5), keep=Keep.TOP)

    split(bisect_by=Plane.YZ.offset(-7.5), keep=Keep.BOTTOM)


with BuildPart() as f13_tool27:
    # F13_s28 → F13_t29 (new body)
    with BuildSketch(Plane.XZ.offset(-32.2820465118)):
        with BuildLine():
            ThreePointArc((-10, -5), (-8.232233047, -4.267766953), (-7.5, -2.5))
            Line((-7.5, -2.5), (-7.5, -5))
            Line((-7.5, -5), (-10, -5))
        make_face()
    extrude(amount=F13_T29_DEPTH)

    split(bisect_by=Plane.XZ.offset(-26.0320465118), keep=Keep.BOTTOM)


with BuildPart() as f13_tool22_1:
    add(f13_tool22.part)

    # F13_t31: intersect F13_tool27
    add(f13_tool27.part, mode=Mode.INTERSECT)


with BuildPart() as f10_2:
    add(f10_1.part)

    # F13_t20: union F13_tool22
    add(f13_tool22_1.part)


with BuildPart() as f13_tool34:
    # F13_s35 → F13_t36 (new body)
    with BuildSketch(Plane.XZ.offset(3.488761819)):
        with BuildLine():
            ThreePointArc((13.5, -5), (11.732233047, -4.267766953), (11, -2.5))
            Line((11, -2.5), (11, -5))
            Line((11, -5), (13.5, -5))
        make_face()
    extrude(amount=-F13_T36_DEPTH)

    split(bisect_by=Plane.XZ.offset(-1.011238181), keep=Keep.BOTTOM)


with BuildPart() as f13_tool38:
    # F13_s39 → F13_t40 (new body)
    with BuildSketch(Plane.YZ.offset(17.25)):
        with BuildLine():
            ThreePointArc((3.511238181, -5), (1.7434712281, -4.267766953), (1.011238181, -2.5))
            Line((1.011238181, -2.5), (1.011238181, -5))
            Line((1.011238181, -5), (3.511238181, -5))
        make_face()
    extrude(amount=-F13_T40_DEPTH)

    split(bisect_by=Plane.YZ.offset(11), keep=Keep.TOP)


with BuildPart() as f13_tool34_1:
    add(f13_tool34.part)

    # F13_t42: intersect F13_tool38
    add(f13_tool38.part, mode=Mode.INTERSECT)


with BuildPart() as f10_3:
    add(f10_2.part)

    # F13_t32: union F13_tool34
    add(f13_tool34_1.part)


with BuildPart() as f13_tool45:
    # F13_s46 → F13_t47 (new body)
    with BuildSketch(Plane.YZ.offset(11)):
        with BuildLine():
            ThreePointArc((3.511238181, -5), (1.7434712281, -4.267766953), (1.011238181, -2.5))
            Line((1.011238181, -2.5), (1.011238181, -5))
            Line((1.011238181, -5), (3.511238181, -5))
        make_face()
    extrude(amount=-F13_T47_DEPTH)

    split(bisect_by=Plane.YZ.offset(-12.5), keep=Keep.TOP)

    split(bisect_by=Plane.YZ.offset(-11), keep=Keep.BOTTOM)


with BuildPart() as f13_tool50:
    # F13_s51 → F13_t52 (new body)
    with BuildSketch(Plane.XZ.offset(-6.7394577997)):
        with BuildLine():
            ThreePointArc((-12.5, -5), (-11.4083499337, -4.0780185463), (-11, -2.7087121525))
            Line((-11, -2.7087121525), (-11, -5))
            Line((-11, -5), (-12.5, -5))
        make_face()
    extrude(amount=F13_T52_DEPTH)

    split(bisect_by=Plane.XZ.offset(-1.011238181), keep=Keep.BOTTOM)


with BuildPart() as f13_tool45_1:
    add(f13_tool45.part)

    # F13_t54: intersect F13_tool50
    add(f13_tool50.part, mode=Mode.INTERSECT)


with BuildPart() as f10_4:
    add(f10_3.part)

    # F13_t43: union F13_tool45
    add(f13_tool45_1.part)


with BuildPart() as f13_tool57:
    # F13_s58 → F13_t59 (new body)
    with BuildSketch(Plane.YZ.offset(-13.75)):
        with BuildLine():
            ThreePointArc((19.0320465118, -5), (20.7998134647, -4.267766953), (21.5320465118, -2.5))
            Line((21.5320465118, -2.5), (21.5320465118, -5))
            Line((21.5320465118, -5), (19.0320465118, -5))
        make_face()
    extrude(amount=F13_T59_DEPTH)

    split(bisect_by=Plane.YZ.offset(-12.5), keep=Keep.TOP)

    split(bisect_by=Plane.YZ.offset(-7.5), keep=Keep.BOTTOM)


with BuildPart() as f13_tool62:
    # F13_s63 → F13_t64 (new body)
    with BuildSketch(Plane.XZ.offset(-26.0320465118)):
        with BuildLine():
            ThreePointArc((-10, -5), (-8.232233047, -4.267766953), (-7.5, -2.5))
            Line((-7.5, -2.5), (-7.5, -5))
            Line((-7.5, -5), (-10, -5))
        make_face()
    extrude(amount=F13_T64_DEPTH)

    split(bisect_by=Plane.XZ.offset(-21.5320465118), keep=Keep.TOP)


with BuildPart() as f13_tool57_1:
    add(f13_tool57.part)

    # F13_t66: intersect F13_tool62
    add(f13_tool62.part, mode=Mode.INTERSECT)


with BuildPart() as f10_5:
    add(f10_4.part)

    # F13_t55: union F13_tool57
    add(f13_tool57_1.part)


with BuildPart() as f13_tool69:
    # F13_s70 → F13_t71 (new body)
    with BuildSketch(Plane.YZ.offset(-17.25)):
        with BuildLine():
            ThreePointArc((-5.988761819, -5), (-4.220994866, -4.267766953), (-3.488761819, -2.5))
            Line((-3.488761819, -2.5), (-3.488761819, -5))
            Line((-3.488761819, -5), (-5.988761819, -5))
        make_face()
    extrude(amount=F13_T71_DEPTH)

    split(bisect_by=Plane.YZ.offset(-12.5), keep=Keep.TOP)

    split(bisect_by=Plane.YZ.offset(-11), keep=Keep.BOTTOM)


with BuildPart() as f13_tool74:
    # F13_s75 → F13_t76 (new body)
    with BuildSketch(Plane.XZ.offset(-1.011238181)):
        with BuildLine():
            ThreePointArc((-12.5, -5), (-11.4083499337, -4.0780185463), (-11, -2.7087121525))
            Line((-11, -2.7087121525), (-11, -5))
            Line((-11, -5), (-12.5, -5))
        make_face()
    extrude(amount=F13_T76_DEPTH)

    split(bisect_by=Plane.XZ.offset(3.488761819), keep=Keep.TOP)


with BuildPart() as f13_tool69_1:
    add(f13_tool69.part)

    # F13_t78: intersect F13_tool74
    add(f13_tool74.part, mode=Mode.INTERSECT)


with BuildPart() as f10_6:
    add(f10_5.part)

    # F13_t67: union F13_tool69
    add(f13_tool69_1.part)


with BuildPart() as f13_tool81:
    # F13_s82 → F13_t83 (new body)
    with BuildSketch(Plane.YZ.offset(-7.5)):
        with BuildLine():
            ThreePointArc((19.0320465118, -5), (20.7998134647, -4.267766953), (21.5320465118, -2.5))
            Line((21.5320465118, -2.5), (21.5320465118, -5))
            Line((21.5320465118, -5), (19.0320465118, -5))
        make_face()
    extrude(amount=F13_T83_DEPTH)

    split(bisect_by=Plane.YZ.offset(7.5), keep=Keep.TOP)


with BuildPart() as f13_tool85:
    # F13_s86 → F13_t87 (new body)
    with BuildSketch(Plane.XZ.offset(-15.2820465118)):
        with BuildLine():
            ThreePointArc((10, -5), (8.232233047, -4.267766953), (7.5, -2.5))
            Line((7.5, -2.5), (7.5, -5))
            Line((7.5, -5), (10, -5))
        make_face()
    extrude(amount=-F13_T87_DEPTH)

    split(bisect_by=Plane.XZ.offset(-21.5320465118), keep=Keep.TOP)


with BuildPart() as f13_tool81_1:
    add(f13_tool81.part)

    # F13_t89: intersect F13_tool85
    add(f13_tool85.part, mode=Mode.INTERSECT)


with BuildPart() as f10_7:
    add(f10_6.part)

    # F13_t79: union F13_tool81
    add(f13_tool81_1.part)


with BuildPart() as f13_tool92:
    # F13_s93 → F13_t94 (new body)
    with BuildSketch(Plane.YZ.offset(-11)):
        with BuildLine():
            ThreePointArc((-5.988761819, -5), (-4.220994866, -4.267766953), (-3.488761819, -2.5))
            Line((-3.488761819, -2.5), (-3.488761819, -5))
            Line((-3.488761819, -5), (-5.988761819, -5))
        make_face()
    extrude(amount=F13_T94_DEPTH)

    split(bisect_by=Plane.YZ.offset(11), keep=Keep.TOP)


with BuildPart() as f13_tool96:
    # F13_s97 → F13_t98 (new body)
    with BuildSketch(Plane.XZ.offset(9.738761819)):
        with BuildLine():
            ThreePointArc((13.5, -5), (11.732233047, -4.267766953), (11, -2.5))
            Line((11, -2.5), (11, -5))
            Line((11, -5), (13.5, -5))
        make_face()
    extrude(amount=-F13_T98_DEPTH)

    split(bisect_by=Plane.XZ.offset(3.488761819), keep=Keep.TOP)


with BuildPart() as f13_tool92_1:
    add(f13_tool92.part)

    # F13_t100: intersect F13_tool96
    add(f13_tool96.part, mode=Mode.INTERSECT)


with BuildPart() as f10_8:
    add(f10_7.part)

    # F13_t90: union F13_tool92
    add(f13_tool92_1.part)


solid = Compound([f1.part, f5.part, f10_8.part])
